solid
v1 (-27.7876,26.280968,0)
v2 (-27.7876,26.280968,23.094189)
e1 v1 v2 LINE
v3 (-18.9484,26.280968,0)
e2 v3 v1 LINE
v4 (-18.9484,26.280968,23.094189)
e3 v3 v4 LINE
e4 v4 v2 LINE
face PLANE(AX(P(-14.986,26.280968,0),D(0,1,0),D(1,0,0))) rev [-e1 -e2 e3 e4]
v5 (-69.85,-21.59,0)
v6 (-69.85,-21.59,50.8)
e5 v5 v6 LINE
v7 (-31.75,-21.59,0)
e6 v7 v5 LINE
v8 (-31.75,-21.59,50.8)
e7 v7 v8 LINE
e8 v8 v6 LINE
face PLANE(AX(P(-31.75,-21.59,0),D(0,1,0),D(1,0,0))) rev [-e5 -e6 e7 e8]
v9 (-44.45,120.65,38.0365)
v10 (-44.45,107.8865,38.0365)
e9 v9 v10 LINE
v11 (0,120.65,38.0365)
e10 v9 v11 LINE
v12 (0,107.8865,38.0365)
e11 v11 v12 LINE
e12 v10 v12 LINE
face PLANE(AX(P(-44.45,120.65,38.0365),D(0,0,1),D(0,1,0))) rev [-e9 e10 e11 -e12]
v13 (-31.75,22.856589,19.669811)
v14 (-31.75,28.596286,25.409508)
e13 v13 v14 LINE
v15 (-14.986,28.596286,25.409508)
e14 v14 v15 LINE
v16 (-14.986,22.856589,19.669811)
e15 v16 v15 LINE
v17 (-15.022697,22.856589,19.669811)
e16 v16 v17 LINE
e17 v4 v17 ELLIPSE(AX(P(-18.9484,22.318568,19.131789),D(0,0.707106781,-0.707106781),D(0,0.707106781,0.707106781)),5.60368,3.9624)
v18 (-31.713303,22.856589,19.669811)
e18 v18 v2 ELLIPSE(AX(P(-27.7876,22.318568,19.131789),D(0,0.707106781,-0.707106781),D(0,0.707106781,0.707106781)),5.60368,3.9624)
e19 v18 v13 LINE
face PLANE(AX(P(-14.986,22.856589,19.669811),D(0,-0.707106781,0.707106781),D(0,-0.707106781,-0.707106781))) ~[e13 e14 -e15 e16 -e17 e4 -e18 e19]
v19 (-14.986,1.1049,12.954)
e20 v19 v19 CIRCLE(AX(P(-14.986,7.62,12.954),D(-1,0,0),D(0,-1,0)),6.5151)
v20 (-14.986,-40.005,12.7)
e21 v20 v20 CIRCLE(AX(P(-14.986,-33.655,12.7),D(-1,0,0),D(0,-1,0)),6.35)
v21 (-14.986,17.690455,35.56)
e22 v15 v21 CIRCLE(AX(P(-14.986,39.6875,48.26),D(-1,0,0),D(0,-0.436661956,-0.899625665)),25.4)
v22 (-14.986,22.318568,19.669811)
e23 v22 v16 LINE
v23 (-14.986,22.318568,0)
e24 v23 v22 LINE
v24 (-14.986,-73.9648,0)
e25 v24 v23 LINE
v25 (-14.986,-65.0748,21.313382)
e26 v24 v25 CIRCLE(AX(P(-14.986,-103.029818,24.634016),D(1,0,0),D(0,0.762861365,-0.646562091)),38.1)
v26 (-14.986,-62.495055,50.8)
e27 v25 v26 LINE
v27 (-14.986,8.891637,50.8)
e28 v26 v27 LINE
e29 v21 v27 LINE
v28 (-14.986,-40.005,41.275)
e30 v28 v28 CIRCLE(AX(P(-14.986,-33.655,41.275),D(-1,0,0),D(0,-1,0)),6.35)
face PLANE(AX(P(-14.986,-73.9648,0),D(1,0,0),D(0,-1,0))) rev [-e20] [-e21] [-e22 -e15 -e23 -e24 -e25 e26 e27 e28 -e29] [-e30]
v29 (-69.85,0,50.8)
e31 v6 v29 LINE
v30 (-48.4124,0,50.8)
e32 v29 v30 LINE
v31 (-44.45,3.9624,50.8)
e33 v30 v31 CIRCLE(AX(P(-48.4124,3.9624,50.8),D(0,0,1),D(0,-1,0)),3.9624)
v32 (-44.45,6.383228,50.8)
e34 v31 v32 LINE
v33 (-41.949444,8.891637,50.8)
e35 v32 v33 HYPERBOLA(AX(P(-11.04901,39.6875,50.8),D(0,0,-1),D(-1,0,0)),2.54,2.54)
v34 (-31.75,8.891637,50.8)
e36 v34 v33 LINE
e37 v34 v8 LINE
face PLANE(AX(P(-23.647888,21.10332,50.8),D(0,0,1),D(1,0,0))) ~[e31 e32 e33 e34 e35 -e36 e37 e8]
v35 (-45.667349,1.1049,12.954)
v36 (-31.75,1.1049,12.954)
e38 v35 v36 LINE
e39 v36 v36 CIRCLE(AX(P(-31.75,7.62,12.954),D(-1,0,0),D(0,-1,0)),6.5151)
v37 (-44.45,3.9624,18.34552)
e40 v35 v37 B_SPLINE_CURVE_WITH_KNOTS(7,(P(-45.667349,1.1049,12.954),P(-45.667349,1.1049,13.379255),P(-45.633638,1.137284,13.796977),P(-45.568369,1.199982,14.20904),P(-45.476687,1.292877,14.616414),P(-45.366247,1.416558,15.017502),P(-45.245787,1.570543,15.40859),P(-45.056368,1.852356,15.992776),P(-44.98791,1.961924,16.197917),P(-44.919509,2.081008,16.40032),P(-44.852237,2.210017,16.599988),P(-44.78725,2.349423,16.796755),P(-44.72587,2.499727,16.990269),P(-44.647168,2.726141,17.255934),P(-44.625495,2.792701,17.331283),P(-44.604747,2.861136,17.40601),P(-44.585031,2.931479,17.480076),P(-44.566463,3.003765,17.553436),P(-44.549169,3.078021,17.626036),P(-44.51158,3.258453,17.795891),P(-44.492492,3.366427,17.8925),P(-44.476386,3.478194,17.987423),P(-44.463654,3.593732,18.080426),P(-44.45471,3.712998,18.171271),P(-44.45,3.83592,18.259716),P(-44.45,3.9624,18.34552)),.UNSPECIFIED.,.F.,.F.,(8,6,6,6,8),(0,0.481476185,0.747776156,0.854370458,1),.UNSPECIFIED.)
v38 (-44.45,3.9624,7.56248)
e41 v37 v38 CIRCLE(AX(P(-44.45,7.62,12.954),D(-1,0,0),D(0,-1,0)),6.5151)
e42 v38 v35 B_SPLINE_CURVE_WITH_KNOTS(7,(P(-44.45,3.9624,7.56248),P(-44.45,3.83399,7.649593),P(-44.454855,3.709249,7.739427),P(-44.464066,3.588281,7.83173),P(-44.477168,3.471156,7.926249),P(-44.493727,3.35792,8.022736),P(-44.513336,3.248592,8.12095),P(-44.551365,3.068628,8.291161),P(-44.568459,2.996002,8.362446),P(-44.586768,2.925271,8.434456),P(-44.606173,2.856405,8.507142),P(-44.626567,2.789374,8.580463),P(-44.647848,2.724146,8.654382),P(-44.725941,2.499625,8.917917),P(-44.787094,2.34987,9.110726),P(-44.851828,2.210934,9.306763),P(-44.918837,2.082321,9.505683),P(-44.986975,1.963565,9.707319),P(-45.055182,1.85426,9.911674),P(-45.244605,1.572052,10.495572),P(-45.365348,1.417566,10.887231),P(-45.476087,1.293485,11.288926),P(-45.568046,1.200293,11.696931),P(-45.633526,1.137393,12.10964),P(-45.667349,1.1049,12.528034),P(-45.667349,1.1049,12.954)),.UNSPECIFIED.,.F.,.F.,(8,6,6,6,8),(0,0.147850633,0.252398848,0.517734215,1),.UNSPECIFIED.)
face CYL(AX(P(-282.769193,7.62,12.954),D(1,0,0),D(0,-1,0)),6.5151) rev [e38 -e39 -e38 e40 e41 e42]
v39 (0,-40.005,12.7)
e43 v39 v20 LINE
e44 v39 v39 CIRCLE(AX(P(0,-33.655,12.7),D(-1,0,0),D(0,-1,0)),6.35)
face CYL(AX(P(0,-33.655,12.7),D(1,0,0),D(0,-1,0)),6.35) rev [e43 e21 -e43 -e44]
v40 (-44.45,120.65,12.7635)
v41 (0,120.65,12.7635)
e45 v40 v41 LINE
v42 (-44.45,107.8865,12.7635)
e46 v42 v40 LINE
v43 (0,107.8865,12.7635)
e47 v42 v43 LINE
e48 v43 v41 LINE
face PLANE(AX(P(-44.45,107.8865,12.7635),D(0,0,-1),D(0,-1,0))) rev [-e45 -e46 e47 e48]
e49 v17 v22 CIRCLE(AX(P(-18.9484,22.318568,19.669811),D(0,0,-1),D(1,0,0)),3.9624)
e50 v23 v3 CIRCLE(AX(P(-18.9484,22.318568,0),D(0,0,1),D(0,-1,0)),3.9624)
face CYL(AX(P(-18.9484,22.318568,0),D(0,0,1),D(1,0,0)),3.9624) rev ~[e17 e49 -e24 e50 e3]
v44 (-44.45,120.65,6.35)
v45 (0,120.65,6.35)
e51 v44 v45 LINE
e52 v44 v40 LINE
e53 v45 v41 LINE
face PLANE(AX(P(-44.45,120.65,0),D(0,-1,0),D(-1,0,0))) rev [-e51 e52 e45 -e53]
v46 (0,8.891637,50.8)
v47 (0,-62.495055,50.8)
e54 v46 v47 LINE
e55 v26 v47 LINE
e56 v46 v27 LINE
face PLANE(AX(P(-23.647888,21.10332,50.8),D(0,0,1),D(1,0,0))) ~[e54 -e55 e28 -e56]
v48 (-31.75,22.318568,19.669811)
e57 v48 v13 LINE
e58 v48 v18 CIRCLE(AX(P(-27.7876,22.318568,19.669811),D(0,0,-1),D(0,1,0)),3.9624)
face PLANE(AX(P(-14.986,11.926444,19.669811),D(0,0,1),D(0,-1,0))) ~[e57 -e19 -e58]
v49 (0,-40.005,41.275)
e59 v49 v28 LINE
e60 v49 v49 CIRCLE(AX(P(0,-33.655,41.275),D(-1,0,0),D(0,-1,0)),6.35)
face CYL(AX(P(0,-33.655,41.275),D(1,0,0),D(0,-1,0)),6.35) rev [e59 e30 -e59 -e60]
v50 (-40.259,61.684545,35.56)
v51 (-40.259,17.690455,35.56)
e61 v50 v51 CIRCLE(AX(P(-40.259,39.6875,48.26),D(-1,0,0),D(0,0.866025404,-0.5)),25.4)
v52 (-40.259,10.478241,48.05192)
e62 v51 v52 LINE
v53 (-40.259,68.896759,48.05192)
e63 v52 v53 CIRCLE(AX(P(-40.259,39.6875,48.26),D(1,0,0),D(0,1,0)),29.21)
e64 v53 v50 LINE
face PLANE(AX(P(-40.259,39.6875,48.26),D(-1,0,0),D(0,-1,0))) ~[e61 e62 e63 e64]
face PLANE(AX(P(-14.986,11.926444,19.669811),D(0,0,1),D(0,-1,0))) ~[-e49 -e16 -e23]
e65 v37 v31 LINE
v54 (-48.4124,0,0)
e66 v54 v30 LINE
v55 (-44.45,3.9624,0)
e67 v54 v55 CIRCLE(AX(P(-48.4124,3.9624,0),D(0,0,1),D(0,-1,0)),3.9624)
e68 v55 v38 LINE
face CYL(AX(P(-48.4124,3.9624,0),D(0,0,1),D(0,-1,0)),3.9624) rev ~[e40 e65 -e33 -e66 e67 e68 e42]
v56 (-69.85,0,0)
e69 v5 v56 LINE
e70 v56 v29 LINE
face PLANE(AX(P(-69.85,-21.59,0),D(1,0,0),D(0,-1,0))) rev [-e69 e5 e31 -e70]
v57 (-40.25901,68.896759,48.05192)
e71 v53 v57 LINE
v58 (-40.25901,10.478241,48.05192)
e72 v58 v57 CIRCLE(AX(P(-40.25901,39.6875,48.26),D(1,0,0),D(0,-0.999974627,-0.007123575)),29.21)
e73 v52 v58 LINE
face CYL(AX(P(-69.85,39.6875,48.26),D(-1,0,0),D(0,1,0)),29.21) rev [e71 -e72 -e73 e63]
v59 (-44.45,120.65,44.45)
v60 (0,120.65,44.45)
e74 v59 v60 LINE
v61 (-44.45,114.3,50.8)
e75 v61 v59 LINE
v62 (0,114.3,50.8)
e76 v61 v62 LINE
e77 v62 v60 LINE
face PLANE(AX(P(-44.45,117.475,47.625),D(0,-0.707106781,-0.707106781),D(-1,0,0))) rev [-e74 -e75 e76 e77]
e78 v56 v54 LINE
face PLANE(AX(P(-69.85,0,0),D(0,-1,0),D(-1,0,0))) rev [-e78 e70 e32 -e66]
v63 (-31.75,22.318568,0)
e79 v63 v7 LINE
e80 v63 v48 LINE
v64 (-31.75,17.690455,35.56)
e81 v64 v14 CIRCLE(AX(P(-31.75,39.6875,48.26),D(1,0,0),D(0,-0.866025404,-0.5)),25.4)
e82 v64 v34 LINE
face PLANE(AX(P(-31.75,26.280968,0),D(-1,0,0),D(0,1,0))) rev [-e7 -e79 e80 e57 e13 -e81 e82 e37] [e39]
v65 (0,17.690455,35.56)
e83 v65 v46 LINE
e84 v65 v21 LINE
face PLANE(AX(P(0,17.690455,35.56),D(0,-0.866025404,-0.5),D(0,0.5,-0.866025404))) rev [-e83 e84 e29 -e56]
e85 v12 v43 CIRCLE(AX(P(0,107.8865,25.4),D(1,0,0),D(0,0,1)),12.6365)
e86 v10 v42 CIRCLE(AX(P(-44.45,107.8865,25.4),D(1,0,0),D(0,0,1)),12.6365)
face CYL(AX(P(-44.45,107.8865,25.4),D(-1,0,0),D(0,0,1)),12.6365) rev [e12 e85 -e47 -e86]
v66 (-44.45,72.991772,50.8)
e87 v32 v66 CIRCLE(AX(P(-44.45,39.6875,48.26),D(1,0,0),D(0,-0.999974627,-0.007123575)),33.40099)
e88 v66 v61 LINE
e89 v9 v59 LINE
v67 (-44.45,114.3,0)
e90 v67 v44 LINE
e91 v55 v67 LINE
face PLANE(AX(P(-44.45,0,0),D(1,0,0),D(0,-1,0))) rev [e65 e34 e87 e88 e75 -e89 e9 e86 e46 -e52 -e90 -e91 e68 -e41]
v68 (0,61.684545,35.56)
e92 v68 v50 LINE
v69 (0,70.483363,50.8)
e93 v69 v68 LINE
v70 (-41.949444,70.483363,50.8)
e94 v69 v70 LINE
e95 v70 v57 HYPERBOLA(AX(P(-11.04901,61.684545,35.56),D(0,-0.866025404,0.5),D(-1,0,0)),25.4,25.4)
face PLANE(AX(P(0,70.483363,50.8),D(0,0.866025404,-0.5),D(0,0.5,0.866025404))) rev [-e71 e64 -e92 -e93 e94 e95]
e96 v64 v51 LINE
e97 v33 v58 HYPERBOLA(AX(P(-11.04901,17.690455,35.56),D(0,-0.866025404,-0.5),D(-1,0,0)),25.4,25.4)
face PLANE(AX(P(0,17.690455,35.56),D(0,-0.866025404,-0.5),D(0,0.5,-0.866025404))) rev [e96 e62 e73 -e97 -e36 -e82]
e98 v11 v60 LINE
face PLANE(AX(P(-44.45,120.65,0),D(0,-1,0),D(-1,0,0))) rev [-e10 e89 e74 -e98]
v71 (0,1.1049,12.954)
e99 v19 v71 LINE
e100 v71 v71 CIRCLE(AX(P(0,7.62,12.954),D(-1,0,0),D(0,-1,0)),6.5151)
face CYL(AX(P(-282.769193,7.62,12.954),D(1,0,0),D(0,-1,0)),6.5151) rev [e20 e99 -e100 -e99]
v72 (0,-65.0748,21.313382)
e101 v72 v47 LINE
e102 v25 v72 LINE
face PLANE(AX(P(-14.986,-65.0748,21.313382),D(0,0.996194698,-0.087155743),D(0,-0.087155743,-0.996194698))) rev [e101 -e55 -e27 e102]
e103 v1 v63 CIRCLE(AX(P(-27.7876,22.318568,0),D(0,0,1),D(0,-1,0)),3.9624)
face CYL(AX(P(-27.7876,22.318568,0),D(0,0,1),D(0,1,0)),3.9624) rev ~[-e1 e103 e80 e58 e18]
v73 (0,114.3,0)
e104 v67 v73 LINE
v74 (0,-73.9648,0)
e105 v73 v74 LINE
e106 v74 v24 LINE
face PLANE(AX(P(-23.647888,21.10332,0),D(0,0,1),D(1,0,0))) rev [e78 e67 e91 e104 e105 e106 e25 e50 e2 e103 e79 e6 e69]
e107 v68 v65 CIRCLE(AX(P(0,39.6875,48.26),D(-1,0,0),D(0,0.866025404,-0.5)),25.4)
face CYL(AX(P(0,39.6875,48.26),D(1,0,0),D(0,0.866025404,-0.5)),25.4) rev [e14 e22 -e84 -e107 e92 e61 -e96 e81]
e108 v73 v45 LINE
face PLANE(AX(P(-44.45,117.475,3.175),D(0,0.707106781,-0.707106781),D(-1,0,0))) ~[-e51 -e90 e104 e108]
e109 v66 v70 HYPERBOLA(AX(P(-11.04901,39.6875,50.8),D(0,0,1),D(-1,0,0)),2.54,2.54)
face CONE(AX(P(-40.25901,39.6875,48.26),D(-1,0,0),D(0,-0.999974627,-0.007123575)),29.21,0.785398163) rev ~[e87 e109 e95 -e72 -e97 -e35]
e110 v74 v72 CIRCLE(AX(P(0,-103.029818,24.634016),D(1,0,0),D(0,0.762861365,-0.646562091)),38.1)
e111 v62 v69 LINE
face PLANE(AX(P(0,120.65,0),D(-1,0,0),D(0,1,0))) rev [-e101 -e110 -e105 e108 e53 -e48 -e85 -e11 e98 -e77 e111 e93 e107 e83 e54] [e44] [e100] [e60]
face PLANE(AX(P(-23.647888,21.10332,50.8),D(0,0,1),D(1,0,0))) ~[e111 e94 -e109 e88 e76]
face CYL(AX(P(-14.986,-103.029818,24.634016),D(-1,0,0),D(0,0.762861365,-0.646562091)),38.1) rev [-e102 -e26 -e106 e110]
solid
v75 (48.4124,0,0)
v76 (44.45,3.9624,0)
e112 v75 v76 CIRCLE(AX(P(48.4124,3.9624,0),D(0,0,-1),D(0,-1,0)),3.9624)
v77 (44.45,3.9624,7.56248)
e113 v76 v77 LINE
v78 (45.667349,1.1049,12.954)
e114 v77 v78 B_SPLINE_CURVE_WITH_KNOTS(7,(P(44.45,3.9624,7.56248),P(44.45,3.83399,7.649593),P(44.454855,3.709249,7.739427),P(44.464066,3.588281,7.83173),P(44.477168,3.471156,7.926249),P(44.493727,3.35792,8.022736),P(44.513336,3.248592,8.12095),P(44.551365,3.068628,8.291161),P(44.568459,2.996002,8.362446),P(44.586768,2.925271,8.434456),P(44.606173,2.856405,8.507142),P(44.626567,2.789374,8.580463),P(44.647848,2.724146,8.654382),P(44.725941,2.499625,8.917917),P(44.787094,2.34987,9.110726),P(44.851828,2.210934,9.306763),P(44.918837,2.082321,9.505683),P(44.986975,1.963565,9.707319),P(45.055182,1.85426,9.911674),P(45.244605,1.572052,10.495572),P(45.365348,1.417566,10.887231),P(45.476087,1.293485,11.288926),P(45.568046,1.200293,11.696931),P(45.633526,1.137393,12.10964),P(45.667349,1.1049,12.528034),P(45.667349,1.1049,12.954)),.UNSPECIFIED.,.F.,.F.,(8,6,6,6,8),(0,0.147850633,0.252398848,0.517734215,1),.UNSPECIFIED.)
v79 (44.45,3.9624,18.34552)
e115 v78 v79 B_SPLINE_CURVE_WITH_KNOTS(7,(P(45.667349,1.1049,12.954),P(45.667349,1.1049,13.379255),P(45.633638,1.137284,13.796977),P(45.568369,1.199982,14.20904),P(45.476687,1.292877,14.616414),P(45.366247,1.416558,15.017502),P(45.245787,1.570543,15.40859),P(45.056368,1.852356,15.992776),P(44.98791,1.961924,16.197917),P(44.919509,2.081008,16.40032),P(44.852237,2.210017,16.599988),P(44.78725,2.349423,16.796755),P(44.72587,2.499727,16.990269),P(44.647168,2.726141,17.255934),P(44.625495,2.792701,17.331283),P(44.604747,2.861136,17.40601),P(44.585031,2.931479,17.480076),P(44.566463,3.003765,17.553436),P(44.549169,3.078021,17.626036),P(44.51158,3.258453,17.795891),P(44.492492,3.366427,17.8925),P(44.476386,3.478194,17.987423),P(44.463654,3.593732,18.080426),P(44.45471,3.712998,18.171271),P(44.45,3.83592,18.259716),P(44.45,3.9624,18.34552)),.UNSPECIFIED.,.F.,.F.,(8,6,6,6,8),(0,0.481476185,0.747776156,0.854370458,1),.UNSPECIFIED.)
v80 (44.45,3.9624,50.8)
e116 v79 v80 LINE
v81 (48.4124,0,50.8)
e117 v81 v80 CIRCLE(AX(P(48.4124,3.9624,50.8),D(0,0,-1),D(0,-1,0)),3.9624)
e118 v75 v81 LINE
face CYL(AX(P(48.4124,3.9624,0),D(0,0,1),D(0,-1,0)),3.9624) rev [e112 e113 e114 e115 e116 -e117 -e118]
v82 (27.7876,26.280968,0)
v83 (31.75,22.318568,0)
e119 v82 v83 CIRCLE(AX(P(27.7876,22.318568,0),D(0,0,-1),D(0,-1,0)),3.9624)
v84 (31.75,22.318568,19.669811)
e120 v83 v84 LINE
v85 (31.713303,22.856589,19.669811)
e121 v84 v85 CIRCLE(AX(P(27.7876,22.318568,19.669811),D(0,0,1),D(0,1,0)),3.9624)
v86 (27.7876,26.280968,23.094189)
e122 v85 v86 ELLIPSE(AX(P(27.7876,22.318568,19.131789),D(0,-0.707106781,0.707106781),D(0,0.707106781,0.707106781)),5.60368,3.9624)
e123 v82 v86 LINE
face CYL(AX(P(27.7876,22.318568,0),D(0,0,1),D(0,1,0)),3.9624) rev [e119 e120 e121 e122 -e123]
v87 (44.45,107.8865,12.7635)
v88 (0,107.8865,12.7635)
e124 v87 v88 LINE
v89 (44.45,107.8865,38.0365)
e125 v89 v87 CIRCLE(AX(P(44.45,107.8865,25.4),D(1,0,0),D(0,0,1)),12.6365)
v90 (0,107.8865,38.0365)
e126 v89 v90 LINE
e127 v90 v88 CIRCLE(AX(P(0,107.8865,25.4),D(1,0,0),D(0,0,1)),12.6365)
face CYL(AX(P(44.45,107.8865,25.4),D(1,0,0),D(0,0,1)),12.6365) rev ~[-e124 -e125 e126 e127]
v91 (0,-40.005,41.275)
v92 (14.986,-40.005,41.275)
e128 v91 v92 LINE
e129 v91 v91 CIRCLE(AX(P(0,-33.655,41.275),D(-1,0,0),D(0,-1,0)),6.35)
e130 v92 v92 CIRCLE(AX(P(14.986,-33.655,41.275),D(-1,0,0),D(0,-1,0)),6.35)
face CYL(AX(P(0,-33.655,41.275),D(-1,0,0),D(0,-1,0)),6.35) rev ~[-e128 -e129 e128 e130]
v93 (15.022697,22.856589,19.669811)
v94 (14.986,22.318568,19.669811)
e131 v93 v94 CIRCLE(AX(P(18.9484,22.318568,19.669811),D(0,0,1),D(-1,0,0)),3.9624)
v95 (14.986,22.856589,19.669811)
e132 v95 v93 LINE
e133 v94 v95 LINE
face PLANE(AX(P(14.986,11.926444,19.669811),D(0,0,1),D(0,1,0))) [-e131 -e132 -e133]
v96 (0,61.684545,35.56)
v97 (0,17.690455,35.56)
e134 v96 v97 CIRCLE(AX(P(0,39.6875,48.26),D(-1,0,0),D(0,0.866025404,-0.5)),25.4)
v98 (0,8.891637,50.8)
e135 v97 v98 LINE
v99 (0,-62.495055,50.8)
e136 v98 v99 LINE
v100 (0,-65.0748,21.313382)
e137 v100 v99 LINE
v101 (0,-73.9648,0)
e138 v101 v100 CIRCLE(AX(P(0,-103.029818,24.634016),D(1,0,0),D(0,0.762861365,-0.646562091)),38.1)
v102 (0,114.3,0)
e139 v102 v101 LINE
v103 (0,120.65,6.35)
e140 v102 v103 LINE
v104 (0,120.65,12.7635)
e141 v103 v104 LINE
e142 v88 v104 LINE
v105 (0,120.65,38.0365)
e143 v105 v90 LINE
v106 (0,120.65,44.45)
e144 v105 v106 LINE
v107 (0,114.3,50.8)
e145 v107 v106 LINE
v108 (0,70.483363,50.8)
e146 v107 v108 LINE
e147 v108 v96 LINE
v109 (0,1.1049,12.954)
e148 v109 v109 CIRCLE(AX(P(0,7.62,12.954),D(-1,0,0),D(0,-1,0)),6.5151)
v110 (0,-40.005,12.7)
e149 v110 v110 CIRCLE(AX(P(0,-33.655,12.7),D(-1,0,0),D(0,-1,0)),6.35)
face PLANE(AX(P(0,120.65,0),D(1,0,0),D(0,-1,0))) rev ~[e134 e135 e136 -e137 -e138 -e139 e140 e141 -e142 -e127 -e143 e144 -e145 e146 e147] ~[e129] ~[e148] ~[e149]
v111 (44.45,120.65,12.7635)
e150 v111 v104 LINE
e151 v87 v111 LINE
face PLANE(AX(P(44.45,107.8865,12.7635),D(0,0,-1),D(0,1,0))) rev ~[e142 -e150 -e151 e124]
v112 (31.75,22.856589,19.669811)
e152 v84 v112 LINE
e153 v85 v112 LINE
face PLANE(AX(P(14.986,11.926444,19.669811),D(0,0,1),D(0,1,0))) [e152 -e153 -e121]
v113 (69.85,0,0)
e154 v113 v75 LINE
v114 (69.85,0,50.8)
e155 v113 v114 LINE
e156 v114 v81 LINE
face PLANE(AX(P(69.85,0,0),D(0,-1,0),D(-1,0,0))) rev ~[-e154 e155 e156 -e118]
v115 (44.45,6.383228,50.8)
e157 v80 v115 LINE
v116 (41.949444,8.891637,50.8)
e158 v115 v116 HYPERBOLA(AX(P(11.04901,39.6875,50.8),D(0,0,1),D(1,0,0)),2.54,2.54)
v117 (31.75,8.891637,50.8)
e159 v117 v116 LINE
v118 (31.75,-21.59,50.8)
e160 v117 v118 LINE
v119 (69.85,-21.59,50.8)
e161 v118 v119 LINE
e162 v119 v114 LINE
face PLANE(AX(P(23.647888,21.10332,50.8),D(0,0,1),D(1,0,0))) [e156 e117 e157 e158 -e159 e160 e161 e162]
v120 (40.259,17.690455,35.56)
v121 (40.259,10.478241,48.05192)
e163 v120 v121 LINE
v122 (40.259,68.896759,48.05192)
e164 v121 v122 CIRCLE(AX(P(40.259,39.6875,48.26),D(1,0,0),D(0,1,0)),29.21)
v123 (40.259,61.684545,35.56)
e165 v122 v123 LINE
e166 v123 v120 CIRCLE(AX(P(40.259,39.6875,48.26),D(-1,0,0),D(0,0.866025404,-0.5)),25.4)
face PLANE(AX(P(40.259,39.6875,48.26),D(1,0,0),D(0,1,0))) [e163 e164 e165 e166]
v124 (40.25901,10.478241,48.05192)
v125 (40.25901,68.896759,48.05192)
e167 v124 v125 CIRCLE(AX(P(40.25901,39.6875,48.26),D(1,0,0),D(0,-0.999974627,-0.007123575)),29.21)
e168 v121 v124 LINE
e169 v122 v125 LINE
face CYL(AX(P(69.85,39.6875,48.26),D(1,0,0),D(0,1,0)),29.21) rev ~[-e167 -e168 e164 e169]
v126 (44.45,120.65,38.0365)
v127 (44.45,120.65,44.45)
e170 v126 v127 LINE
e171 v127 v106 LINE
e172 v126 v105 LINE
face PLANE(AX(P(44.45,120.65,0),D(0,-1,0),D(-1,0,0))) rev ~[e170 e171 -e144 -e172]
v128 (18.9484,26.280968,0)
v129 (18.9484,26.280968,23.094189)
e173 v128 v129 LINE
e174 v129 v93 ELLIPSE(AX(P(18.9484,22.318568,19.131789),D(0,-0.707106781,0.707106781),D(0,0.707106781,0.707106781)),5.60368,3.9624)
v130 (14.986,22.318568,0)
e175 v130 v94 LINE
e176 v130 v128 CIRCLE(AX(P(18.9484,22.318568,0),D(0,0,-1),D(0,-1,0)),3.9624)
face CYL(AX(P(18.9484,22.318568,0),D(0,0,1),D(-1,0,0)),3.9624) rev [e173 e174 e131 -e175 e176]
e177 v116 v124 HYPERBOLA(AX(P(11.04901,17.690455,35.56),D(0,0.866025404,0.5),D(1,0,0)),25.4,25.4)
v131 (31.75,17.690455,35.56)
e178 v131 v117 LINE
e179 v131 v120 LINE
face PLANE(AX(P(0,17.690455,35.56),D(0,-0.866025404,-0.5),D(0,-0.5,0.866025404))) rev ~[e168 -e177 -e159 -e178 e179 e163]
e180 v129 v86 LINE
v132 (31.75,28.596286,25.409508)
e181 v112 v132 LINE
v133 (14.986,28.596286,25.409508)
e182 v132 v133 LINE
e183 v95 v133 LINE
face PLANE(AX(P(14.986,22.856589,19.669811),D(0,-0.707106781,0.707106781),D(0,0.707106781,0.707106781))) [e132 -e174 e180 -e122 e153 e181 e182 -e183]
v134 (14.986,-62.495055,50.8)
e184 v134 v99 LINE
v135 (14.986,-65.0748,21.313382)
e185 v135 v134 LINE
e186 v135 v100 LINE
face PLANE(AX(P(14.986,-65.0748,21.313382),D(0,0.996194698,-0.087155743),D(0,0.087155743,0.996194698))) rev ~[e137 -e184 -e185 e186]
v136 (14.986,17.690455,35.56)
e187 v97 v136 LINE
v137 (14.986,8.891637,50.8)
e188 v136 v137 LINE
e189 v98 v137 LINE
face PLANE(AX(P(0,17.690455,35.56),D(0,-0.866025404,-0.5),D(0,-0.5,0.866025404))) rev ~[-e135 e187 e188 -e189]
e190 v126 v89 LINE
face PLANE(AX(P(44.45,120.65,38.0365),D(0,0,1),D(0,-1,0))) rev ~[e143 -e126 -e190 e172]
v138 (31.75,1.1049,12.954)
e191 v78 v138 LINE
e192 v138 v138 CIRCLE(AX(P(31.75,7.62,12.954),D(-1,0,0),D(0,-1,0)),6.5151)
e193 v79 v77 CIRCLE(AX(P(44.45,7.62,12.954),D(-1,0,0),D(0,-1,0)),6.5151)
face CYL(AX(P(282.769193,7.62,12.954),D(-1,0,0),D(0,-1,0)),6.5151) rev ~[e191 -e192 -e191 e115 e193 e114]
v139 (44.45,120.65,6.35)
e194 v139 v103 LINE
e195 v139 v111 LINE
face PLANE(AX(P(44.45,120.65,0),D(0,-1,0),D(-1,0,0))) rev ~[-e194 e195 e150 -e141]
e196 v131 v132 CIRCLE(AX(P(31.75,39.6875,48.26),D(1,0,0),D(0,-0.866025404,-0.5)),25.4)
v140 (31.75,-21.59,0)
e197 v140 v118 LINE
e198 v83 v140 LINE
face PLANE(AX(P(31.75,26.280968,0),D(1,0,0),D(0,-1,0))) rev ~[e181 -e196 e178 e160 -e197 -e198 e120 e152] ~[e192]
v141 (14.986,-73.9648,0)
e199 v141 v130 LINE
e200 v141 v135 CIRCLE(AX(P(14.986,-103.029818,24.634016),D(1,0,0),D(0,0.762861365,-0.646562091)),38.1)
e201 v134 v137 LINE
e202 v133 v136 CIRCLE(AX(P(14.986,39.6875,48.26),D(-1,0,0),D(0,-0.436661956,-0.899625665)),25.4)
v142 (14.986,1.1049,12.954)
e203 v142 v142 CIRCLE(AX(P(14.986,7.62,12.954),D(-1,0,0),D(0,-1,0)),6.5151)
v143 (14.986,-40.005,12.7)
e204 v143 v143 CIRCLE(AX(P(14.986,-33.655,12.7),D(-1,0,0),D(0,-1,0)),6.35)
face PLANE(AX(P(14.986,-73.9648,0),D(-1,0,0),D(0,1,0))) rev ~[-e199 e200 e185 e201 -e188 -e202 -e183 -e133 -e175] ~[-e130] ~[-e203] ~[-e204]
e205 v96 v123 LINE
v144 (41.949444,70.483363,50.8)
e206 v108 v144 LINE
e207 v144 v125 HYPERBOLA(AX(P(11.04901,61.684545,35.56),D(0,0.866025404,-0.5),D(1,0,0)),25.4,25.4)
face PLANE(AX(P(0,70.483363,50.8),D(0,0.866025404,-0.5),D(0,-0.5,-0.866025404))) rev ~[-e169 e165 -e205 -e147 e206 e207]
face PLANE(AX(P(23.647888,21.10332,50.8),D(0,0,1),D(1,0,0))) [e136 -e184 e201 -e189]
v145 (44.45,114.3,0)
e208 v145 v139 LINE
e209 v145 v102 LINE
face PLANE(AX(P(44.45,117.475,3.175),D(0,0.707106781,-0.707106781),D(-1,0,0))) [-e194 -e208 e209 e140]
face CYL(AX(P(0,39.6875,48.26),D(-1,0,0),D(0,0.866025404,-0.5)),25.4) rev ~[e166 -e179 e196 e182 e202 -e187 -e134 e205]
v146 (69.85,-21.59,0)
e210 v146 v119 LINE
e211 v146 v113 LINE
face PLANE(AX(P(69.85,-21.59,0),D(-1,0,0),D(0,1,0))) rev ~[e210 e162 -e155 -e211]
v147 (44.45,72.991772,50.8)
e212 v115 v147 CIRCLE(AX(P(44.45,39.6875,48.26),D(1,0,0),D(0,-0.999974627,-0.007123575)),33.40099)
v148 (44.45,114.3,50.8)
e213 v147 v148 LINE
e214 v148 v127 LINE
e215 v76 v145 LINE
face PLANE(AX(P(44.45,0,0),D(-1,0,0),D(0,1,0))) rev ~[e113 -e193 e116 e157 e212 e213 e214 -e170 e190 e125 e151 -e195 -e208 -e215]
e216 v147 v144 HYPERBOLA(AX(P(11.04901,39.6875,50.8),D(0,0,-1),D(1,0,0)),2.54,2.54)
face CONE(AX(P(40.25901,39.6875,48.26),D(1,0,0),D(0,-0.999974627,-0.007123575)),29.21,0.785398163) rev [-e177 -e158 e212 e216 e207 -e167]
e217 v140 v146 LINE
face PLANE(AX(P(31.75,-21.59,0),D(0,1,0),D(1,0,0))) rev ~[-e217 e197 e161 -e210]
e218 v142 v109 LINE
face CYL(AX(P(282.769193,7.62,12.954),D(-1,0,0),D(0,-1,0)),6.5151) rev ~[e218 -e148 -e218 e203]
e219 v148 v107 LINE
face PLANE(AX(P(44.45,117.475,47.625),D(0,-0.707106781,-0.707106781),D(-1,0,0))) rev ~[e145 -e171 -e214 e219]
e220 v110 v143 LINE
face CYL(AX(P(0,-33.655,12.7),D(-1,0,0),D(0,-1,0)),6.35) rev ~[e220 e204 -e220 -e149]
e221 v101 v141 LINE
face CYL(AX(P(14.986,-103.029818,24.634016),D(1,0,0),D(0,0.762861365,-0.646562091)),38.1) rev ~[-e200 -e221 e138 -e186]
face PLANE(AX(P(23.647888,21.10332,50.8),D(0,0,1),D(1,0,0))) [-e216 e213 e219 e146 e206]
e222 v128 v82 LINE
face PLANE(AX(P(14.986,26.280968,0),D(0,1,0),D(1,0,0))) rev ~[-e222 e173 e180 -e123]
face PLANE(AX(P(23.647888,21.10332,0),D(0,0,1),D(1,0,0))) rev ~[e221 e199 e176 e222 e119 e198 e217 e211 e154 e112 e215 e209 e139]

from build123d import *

# Parameters (mm, degrees)
F1_DEPTH  = 50.8
F2_R      = 3.9624
F3_SIZE   = 6.35
F5_DEPTH  = 44.451
F7_D      = 13.0302
F9_DEPTH  = 69.851
F10_R     = 29.21
F11_DEPTH = 29.591
F12_SIZE  = 4.19099
F14_DEPTH = 14.9870001
F16_DEPTH = 16.764
F17_R     = 6.35
F18_DEPTH = 69.851


# Not quite as in the source:
# - a fillet or chamfer is up to 0.001 mm smaller than in the source, because OpenCascade refuses the exact size


with BuildPart() as f1:
    # F0 (on Top) → F1 (new body)
    with BuildSketch(Plane.XY):
        Polygon((44.45, 120.65), (0, 120.65), (0, 0), (0, -21.59), (0, -73.9648), (14.986, -73.9648), (14.986, 26.2809675187), (31.75, 26.2809675187), (31.75, -21.59), (69.85, -21.59), (69.85, 0), (44.45, 0), align=None)
    extrude(amount=F1_DEPTH)

    # F2
    f2_edges = [f1.edges().sort_by_distance(p)[0] for p in [
        (44.45, 0, 25.4),
        (14.986, 26.280968, 25.4),
        (31.75, 26.280968, 25.4),
    ]]
    fillet(f2_edges, radius=F2_R)

    # F3
    f3_edges = [f1.edges().sort_by_distance(p)[0] for p in [
        (22.225, 120.65, 50.8),
        (22.225, 120.65, 0),
    ]]
    chamfer(f3_edges, length=F3_SIZE)

    # F4 (on face) → F5 (cut, through all)
    with BuildSketch(Plane.YZ.offset(44.45)):
        with BuildLine():
            Line((120.65, 38.0365), (107.8865, 38.0365))
            ThreePointArc((107.8865, 38.0365), (95.25, 25.4), (107.8865, 12.7635))
            Line((107.8865, 12.7635), (120.65, 12.7635))
            Line((120.65, 12.7635), (120.65, 38.0365))
        make_face()
    extrude(amount=-F5_DEPTH, mode=Mode.SUBTRACT)

    # F7 (through all)
    with Locations(Plane.YZ.offset(69.85)):
        with Locations((7.62, 12.954)):
            Hole(F7_D / 2)

    # F8 (on face) → F9 (cut, through all)
    with BuildSketch(Plane(origin=(0, 0, 0), x_dir=(0, -1, 0), z_dir=(-1, 0, 0))):
        with BuildLine():
            Line((-8.8916366414, 50.8), (-70.4833633586, 50.8))
            Line((-70.4833633586, 50.8), (-61.6845452561, 35.56))
            ThreePointArc((-61.6845452561, 35.56), (-39.6875, 22.86), (-17.6904547439, 35.56))
            Line((-17.6904547439, 35.56), (-8.8916366414, 50.8))
        make_face()
    extrude(amount=-F9_DEPTH, mode=Mode.SUBTRACT)

    # F10 (on face) → F11 (cut)
    with BuildSketch(Plane.YZ.offset(69.85)):
        with Locations((39.6875, 48.26)):
            Circle(F10_R)
    extrude(amount=-F11_DEPTH, mode=Mode.SUBTRACT)

    # F12 (size 4.191 in the source; OpenCascade refuses exactly that, so slightly less here)
    f12_edges = [f1.edges().sort_by_distance(p)[0] for p in [
        (44.45, 39.6875, 19.05),
    ]]
    chamfer(f12_edges, length=F12_SIZE)

    # F13 (on face) → F14 (cut, through all)
    with BuildSketch(Plane.YZ.offset(14.986)):
        with BuildLine():
            Line((-73.9648, 50.8), (-73.9648, 0))
            ThreePointArc((-73.9648, 0), (-67.8661098873, 9.9669221787), (-65.0748, 21.3133818873))
            Line((-65.0748, 21.3133818873), (-62.4950551894, 50.8))
            Line((-62.4950551894, 50.8), (-73.9648, 50.8))
        make_face()
    extrude(amount=-F14_DEPTH, mode=Mode.SUBTRACT)

    # F15 (on face) → F16 (cut, through all)
    with BuildSketch(Plane.YZ.offset(14.986)):
        Polygon((11.9264439221, 19.6698105436), (22.8565887415, 19.6698105436), (41.9241071546, 38.7373289567), (11.9264439221, 38.7373289567), align=None)
    extrude(amount=F16_DEPTH, mode=Mode.SUBTRACT)

    # F17 (on face) → F18 (cut, through all)
    with BuildSketch(Plane(origin=(0, 0, 0), x_dir=(0, -1, 0), z_dir=(-1, 0, 0))):
        with Locations((33.655, 12.7)):
            Circle(F17_R)
        with Locations((33.655, 41.275)):
            Circle(F17_R)
    extrude(amount=-F18_DEPTH, mode=Mode.SUBTRACT)


with BuildPart() as f19_1:
    # F19: instance of F1
    add(f1.part.mirror(Plane.YZ))


solid = Compound([f1.part, f19_1.part])
